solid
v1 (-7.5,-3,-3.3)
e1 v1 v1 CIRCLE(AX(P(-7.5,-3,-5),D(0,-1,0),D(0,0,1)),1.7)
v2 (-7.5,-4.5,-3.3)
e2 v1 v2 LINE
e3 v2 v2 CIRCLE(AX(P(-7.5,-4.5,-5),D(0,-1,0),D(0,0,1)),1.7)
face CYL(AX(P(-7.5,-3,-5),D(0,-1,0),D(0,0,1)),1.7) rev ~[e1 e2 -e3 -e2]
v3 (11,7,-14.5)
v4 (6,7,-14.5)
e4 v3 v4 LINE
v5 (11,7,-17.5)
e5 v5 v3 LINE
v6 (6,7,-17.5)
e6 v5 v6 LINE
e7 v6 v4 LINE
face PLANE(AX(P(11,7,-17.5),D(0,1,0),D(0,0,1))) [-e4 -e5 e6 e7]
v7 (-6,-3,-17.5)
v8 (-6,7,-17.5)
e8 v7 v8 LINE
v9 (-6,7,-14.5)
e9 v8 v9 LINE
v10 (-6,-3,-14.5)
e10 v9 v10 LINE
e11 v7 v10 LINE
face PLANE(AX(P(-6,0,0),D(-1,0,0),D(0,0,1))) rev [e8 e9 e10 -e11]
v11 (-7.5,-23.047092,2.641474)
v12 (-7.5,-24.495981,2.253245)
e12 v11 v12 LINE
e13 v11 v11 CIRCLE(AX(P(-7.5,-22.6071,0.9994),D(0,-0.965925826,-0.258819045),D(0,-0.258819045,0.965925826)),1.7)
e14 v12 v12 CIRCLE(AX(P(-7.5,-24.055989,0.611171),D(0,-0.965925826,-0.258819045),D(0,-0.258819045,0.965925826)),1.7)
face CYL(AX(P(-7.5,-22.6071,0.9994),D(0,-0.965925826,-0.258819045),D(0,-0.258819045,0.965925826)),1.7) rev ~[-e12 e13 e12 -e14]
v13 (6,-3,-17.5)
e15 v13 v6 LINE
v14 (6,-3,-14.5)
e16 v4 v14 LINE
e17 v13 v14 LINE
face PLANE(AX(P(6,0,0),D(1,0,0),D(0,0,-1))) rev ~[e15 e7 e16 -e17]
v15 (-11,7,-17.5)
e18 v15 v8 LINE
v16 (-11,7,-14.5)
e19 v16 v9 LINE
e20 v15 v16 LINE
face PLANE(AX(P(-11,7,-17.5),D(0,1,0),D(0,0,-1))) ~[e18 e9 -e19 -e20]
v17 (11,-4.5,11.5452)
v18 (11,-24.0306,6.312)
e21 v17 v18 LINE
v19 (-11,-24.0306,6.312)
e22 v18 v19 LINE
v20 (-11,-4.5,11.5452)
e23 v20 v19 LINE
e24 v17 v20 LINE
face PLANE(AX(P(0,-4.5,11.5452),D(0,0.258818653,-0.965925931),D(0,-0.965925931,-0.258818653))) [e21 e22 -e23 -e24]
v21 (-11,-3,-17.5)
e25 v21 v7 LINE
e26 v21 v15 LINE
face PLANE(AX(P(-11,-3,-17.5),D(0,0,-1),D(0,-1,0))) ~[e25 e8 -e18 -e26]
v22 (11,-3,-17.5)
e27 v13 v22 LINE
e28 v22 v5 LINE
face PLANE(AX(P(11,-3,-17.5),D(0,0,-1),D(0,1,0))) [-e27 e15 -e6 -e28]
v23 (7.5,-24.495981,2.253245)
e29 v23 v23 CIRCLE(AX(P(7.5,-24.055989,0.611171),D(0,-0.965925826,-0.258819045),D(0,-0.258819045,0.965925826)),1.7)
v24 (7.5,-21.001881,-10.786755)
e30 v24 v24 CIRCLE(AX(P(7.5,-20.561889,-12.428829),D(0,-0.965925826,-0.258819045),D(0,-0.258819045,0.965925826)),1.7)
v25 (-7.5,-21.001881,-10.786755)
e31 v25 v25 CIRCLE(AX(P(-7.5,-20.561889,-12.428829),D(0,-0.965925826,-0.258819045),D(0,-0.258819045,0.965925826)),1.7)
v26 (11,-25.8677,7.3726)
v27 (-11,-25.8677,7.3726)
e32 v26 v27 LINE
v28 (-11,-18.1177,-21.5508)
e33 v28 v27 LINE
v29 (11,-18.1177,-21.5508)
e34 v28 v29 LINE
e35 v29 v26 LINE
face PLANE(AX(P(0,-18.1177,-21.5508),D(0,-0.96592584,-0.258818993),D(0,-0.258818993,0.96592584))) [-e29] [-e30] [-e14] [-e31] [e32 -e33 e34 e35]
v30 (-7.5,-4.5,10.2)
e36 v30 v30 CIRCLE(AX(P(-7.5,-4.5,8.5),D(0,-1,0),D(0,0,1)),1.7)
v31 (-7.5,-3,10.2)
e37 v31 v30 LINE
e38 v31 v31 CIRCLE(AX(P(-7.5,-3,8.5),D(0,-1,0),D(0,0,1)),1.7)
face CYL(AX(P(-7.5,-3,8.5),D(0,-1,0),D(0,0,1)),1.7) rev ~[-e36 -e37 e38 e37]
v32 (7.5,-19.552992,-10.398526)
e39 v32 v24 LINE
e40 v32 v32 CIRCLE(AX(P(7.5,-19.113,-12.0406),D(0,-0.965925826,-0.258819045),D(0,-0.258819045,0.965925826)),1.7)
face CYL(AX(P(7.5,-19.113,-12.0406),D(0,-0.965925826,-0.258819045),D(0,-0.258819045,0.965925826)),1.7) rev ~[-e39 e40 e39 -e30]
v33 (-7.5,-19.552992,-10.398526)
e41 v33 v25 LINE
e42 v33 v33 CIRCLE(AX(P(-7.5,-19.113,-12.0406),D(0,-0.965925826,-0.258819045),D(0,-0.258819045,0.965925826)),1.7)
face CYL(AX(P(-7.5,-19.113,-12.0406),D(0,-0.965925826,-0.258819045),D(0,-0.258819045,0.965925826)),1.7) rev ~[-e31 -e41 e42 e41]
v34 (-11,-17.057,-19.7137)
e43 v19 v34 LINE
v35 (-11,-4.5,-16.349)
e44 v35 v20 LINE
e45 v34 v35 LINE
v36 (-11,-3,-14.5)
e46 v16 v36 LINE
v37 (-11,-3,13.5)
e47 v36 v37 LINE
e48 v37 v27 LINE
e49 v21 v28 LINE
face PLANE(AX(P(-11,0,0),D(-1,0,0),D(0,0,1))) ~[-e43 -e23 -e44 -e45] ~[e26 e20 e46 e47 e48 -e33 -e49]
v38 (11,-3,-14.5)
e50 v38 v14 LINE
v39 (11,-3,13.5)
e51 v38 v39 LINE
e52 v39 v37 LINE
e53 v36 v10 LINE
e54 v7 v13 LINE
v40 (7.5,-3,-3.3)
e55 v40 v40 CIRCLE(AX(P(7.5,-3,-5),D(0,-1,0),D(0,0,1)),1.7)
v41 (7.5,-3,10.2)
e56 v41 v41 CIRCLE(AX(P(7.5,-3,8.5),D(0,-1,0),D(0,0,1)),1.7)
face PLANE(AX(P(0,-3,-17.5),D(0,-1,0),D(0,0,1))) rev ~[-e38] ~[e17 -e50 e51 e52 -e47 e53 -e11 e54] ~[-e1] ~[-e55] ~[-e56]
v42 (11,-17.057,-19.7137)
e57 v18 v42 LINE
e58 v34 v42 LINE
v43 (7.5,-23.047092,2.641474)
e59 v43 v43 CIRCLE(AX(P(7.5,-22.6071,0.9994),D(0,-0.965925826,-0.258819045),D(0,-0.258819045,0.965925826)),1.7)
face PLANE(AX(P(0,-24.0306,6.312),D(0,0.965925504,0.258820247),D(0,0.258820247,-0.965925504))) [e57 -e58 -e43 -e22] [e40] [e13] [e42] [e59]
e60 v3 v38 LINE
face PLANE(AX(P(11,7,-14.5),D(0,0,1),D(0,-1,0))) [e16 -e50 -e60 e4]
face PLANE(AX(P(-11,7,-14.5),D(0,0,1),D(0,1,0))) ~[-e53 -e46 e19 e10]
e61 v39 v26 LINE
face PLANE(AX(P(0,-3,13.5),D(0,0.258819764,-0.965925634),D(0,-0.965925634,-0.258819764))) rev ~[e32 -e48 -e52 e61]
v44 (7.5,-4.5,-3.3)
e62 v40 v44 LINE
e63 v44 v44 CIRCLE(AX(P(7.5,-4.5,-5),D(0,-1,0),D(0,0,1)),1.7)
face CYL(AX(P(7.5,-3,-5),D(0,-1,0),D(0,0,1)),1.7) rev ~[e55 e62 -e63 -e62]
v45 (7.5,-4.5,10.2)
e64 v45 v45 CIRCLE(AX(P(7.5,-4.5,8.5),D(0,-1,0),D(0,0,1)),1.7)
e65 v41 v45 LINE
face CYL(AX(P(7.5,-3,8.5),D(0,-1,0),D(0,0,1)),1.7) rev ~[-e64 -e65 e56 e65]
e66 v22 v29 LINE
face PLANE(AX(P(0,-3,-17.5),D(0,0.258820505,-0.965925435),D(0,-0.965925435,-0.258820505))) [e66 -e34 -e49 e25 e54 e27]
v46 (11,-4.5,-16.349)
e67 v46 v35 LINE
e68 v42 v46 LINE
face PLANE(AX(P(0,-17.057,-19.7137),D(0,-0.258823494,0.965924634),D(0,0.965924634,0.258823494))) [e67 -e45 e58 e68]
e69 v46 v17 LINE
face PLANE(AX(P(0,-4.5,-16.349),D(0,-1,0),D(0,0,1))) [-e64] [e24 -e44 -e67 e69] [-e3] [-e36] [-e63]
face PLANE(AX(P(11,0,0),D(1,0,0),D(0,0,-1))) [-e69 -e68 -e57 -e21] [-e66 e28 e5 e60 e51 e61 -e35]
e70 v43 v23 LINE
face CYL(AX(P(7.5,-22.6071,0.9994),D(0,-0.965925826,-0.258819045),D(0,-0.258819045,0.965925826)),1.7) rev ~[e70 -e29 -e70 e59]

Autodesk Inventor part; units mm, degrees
ref_plane "YZ Plane" through (0, 0, 0) normal (1, 0, 0) x (0, 1, 0)
ref_plane "XZ Plane" through (0, 0, 0) normal (0, 1, 0) x (-1, 0, 0)
ref_plane "XY Plane" through (0, 0, 0) normal (0, 0, 1) x (1, 0, 0)
sketch "Sketch1" plane through (0, 0, 0) normal (0, 1, 0) x (-1, 0, 0)
  line L0 (15, 13.5) -> (15, -13.5)
  line L1 (15, -13.5) -> (-15, -13.5)
  line L2 (-15, -13.5) -> (-15, 13.5)
  line L3 (-15, 13.5) -> (15, 13.5)
  point P0 (0, -13.5)
  point P1 (-15, 0)
  dimension "d2" = 27
  dimension "d3" = 30
extrude "Extrusion1" [suppressed]
sketch "Sketch4" plane through (0, 0, 0) normal (1, 0, 0) x (0, 1, 0)
  line L0 (-18.1177, -21.5508) -> (-25.8677, 7.3726)
  line L1 (0, 13.5) -> (-3, 13.5) projected
  line L2 (-17.057, -19.7137) -> (-4.5, -16.349)
  line L3 (-4.5, 11.5452) -> (-24.0306, 6.312)
  line L4 (-3, -17.5) -> (-3, 13.5)
  line L5 (-24.0306, 6.312) -> (-17.057, -19.7137)
  line L6 (-4.5, -16.349) -> (-4.5, 11.5452)
  line L7 (-3, -13.5) -> (-3, 13.5) projected
  line L8 (-3, 13.5) -> (-25.8677, 7.3726)
  line L9 (-3, -17.5) -> (-18.1177, -21.5508)
  point P0 (0, 0)
  point P1 (-51.8403, 80.9842)
  point P2 (-3, 0)
  point P3 (-3, 0)
  point P4 (-3, 0)
  point P5 (-14.2653, 8.9286)
  point P6 (-10.5588, -19.5254)
  dimension "d50" = 1.5
  dimension "d57" = 1.5
  dimension "d59" = 1.5
  dimension "d60" = 1.5
  dimension "d62" = 4
  dimension "d63" = 15
  dimension "d64" = 13
extrude "Extrusion3" add sketch "Sketch4" along normal mid plane 22
sketch "Sketch5" plane through (11, 0, 0) normal (1, 0, 0) x (0, 0, -1)
  line L0 (17.5, -3) -> (-13.5, -3) projected
  line L1 (14.5, -3) -> (17.5, -3)
  line L2 (17.5, -3) -> (17.5, 7)
  line L3 (17.5, 7) -> (14.5, 7)
  line L4 (14.5, 7) -> (14.5, -3)
  point P0 (0, 0)
  point P1 (13.5, -3)
  dimension "d67" = 3
  dimension "d68" = 10
extrude "Extrusion4" add sketch "Sketch5" against normal blind 5
mirror "Mirror1" about plane through (0, 0, 0) normal (1, 0, 0) of "Extrusion4"
sketch "Sketch6" plane through (0, -3, 0) normal (0, 1, 0) x (1, 0, 0)
  line L0 (15, 13.5) -> (15, -13.5) projected
  line L1 (11, -13.5) -> (-11, -13.5) projected
  line L2 (-11, 13.5) -> (11, 13.5) projected
  point P0 (0, 0)
  point P1 (-7.5, 5)
  point P2 (7.5, 5)
  point P3 (7.5, -8.5)
  point P4 (-7.5, -8.5)
  dimension "d71" = 15
  dimension "d72" = 13.5
  dimension "d73" = 7.5
  dimension "d74" = 5
  dimension "d75" = 8.5
hole "Hole2" at (-7.5, -3, -5) at (7.5, -3, -5) at (7.5, -3, 8.5) at (-7.5, -3, 8.5) direction (0, -1, 0) diameter 3.4 depth 1.5
sketch "Sketch7" plane through (-11, -24.0306, 6.312) normal (0, 0.9659258, 0.258819) x (1, 0, 0)
  line L0 (22, -1.5) -> (0, -1.5) projected
  line L1 (22, -1.5) -> (22, 28.4437) projected
  point P0 (11, 12.3165)
  point P1 (3.5, 19)
  point P2 (18.5, 19)
  point P3 (18.5, 5.5)
  point P4 (3.5, 5.5)
  dimension "d83" = 15
  dimension "d84" = 13.5
  dimension "d88" = 7
  dimension "d89" = 3.5
hole "Hole3" at (-7.5, -22.6071, 0.9994) at (7.5, -22.6071, 0.9994) at (7.5, -19.113, -12.0406) at (-7.5, -19.113, -12.0406) direction (0, -0.9659258, -0.258819) diameter 3.4 depth 1.5
properties part number "Ramp"
